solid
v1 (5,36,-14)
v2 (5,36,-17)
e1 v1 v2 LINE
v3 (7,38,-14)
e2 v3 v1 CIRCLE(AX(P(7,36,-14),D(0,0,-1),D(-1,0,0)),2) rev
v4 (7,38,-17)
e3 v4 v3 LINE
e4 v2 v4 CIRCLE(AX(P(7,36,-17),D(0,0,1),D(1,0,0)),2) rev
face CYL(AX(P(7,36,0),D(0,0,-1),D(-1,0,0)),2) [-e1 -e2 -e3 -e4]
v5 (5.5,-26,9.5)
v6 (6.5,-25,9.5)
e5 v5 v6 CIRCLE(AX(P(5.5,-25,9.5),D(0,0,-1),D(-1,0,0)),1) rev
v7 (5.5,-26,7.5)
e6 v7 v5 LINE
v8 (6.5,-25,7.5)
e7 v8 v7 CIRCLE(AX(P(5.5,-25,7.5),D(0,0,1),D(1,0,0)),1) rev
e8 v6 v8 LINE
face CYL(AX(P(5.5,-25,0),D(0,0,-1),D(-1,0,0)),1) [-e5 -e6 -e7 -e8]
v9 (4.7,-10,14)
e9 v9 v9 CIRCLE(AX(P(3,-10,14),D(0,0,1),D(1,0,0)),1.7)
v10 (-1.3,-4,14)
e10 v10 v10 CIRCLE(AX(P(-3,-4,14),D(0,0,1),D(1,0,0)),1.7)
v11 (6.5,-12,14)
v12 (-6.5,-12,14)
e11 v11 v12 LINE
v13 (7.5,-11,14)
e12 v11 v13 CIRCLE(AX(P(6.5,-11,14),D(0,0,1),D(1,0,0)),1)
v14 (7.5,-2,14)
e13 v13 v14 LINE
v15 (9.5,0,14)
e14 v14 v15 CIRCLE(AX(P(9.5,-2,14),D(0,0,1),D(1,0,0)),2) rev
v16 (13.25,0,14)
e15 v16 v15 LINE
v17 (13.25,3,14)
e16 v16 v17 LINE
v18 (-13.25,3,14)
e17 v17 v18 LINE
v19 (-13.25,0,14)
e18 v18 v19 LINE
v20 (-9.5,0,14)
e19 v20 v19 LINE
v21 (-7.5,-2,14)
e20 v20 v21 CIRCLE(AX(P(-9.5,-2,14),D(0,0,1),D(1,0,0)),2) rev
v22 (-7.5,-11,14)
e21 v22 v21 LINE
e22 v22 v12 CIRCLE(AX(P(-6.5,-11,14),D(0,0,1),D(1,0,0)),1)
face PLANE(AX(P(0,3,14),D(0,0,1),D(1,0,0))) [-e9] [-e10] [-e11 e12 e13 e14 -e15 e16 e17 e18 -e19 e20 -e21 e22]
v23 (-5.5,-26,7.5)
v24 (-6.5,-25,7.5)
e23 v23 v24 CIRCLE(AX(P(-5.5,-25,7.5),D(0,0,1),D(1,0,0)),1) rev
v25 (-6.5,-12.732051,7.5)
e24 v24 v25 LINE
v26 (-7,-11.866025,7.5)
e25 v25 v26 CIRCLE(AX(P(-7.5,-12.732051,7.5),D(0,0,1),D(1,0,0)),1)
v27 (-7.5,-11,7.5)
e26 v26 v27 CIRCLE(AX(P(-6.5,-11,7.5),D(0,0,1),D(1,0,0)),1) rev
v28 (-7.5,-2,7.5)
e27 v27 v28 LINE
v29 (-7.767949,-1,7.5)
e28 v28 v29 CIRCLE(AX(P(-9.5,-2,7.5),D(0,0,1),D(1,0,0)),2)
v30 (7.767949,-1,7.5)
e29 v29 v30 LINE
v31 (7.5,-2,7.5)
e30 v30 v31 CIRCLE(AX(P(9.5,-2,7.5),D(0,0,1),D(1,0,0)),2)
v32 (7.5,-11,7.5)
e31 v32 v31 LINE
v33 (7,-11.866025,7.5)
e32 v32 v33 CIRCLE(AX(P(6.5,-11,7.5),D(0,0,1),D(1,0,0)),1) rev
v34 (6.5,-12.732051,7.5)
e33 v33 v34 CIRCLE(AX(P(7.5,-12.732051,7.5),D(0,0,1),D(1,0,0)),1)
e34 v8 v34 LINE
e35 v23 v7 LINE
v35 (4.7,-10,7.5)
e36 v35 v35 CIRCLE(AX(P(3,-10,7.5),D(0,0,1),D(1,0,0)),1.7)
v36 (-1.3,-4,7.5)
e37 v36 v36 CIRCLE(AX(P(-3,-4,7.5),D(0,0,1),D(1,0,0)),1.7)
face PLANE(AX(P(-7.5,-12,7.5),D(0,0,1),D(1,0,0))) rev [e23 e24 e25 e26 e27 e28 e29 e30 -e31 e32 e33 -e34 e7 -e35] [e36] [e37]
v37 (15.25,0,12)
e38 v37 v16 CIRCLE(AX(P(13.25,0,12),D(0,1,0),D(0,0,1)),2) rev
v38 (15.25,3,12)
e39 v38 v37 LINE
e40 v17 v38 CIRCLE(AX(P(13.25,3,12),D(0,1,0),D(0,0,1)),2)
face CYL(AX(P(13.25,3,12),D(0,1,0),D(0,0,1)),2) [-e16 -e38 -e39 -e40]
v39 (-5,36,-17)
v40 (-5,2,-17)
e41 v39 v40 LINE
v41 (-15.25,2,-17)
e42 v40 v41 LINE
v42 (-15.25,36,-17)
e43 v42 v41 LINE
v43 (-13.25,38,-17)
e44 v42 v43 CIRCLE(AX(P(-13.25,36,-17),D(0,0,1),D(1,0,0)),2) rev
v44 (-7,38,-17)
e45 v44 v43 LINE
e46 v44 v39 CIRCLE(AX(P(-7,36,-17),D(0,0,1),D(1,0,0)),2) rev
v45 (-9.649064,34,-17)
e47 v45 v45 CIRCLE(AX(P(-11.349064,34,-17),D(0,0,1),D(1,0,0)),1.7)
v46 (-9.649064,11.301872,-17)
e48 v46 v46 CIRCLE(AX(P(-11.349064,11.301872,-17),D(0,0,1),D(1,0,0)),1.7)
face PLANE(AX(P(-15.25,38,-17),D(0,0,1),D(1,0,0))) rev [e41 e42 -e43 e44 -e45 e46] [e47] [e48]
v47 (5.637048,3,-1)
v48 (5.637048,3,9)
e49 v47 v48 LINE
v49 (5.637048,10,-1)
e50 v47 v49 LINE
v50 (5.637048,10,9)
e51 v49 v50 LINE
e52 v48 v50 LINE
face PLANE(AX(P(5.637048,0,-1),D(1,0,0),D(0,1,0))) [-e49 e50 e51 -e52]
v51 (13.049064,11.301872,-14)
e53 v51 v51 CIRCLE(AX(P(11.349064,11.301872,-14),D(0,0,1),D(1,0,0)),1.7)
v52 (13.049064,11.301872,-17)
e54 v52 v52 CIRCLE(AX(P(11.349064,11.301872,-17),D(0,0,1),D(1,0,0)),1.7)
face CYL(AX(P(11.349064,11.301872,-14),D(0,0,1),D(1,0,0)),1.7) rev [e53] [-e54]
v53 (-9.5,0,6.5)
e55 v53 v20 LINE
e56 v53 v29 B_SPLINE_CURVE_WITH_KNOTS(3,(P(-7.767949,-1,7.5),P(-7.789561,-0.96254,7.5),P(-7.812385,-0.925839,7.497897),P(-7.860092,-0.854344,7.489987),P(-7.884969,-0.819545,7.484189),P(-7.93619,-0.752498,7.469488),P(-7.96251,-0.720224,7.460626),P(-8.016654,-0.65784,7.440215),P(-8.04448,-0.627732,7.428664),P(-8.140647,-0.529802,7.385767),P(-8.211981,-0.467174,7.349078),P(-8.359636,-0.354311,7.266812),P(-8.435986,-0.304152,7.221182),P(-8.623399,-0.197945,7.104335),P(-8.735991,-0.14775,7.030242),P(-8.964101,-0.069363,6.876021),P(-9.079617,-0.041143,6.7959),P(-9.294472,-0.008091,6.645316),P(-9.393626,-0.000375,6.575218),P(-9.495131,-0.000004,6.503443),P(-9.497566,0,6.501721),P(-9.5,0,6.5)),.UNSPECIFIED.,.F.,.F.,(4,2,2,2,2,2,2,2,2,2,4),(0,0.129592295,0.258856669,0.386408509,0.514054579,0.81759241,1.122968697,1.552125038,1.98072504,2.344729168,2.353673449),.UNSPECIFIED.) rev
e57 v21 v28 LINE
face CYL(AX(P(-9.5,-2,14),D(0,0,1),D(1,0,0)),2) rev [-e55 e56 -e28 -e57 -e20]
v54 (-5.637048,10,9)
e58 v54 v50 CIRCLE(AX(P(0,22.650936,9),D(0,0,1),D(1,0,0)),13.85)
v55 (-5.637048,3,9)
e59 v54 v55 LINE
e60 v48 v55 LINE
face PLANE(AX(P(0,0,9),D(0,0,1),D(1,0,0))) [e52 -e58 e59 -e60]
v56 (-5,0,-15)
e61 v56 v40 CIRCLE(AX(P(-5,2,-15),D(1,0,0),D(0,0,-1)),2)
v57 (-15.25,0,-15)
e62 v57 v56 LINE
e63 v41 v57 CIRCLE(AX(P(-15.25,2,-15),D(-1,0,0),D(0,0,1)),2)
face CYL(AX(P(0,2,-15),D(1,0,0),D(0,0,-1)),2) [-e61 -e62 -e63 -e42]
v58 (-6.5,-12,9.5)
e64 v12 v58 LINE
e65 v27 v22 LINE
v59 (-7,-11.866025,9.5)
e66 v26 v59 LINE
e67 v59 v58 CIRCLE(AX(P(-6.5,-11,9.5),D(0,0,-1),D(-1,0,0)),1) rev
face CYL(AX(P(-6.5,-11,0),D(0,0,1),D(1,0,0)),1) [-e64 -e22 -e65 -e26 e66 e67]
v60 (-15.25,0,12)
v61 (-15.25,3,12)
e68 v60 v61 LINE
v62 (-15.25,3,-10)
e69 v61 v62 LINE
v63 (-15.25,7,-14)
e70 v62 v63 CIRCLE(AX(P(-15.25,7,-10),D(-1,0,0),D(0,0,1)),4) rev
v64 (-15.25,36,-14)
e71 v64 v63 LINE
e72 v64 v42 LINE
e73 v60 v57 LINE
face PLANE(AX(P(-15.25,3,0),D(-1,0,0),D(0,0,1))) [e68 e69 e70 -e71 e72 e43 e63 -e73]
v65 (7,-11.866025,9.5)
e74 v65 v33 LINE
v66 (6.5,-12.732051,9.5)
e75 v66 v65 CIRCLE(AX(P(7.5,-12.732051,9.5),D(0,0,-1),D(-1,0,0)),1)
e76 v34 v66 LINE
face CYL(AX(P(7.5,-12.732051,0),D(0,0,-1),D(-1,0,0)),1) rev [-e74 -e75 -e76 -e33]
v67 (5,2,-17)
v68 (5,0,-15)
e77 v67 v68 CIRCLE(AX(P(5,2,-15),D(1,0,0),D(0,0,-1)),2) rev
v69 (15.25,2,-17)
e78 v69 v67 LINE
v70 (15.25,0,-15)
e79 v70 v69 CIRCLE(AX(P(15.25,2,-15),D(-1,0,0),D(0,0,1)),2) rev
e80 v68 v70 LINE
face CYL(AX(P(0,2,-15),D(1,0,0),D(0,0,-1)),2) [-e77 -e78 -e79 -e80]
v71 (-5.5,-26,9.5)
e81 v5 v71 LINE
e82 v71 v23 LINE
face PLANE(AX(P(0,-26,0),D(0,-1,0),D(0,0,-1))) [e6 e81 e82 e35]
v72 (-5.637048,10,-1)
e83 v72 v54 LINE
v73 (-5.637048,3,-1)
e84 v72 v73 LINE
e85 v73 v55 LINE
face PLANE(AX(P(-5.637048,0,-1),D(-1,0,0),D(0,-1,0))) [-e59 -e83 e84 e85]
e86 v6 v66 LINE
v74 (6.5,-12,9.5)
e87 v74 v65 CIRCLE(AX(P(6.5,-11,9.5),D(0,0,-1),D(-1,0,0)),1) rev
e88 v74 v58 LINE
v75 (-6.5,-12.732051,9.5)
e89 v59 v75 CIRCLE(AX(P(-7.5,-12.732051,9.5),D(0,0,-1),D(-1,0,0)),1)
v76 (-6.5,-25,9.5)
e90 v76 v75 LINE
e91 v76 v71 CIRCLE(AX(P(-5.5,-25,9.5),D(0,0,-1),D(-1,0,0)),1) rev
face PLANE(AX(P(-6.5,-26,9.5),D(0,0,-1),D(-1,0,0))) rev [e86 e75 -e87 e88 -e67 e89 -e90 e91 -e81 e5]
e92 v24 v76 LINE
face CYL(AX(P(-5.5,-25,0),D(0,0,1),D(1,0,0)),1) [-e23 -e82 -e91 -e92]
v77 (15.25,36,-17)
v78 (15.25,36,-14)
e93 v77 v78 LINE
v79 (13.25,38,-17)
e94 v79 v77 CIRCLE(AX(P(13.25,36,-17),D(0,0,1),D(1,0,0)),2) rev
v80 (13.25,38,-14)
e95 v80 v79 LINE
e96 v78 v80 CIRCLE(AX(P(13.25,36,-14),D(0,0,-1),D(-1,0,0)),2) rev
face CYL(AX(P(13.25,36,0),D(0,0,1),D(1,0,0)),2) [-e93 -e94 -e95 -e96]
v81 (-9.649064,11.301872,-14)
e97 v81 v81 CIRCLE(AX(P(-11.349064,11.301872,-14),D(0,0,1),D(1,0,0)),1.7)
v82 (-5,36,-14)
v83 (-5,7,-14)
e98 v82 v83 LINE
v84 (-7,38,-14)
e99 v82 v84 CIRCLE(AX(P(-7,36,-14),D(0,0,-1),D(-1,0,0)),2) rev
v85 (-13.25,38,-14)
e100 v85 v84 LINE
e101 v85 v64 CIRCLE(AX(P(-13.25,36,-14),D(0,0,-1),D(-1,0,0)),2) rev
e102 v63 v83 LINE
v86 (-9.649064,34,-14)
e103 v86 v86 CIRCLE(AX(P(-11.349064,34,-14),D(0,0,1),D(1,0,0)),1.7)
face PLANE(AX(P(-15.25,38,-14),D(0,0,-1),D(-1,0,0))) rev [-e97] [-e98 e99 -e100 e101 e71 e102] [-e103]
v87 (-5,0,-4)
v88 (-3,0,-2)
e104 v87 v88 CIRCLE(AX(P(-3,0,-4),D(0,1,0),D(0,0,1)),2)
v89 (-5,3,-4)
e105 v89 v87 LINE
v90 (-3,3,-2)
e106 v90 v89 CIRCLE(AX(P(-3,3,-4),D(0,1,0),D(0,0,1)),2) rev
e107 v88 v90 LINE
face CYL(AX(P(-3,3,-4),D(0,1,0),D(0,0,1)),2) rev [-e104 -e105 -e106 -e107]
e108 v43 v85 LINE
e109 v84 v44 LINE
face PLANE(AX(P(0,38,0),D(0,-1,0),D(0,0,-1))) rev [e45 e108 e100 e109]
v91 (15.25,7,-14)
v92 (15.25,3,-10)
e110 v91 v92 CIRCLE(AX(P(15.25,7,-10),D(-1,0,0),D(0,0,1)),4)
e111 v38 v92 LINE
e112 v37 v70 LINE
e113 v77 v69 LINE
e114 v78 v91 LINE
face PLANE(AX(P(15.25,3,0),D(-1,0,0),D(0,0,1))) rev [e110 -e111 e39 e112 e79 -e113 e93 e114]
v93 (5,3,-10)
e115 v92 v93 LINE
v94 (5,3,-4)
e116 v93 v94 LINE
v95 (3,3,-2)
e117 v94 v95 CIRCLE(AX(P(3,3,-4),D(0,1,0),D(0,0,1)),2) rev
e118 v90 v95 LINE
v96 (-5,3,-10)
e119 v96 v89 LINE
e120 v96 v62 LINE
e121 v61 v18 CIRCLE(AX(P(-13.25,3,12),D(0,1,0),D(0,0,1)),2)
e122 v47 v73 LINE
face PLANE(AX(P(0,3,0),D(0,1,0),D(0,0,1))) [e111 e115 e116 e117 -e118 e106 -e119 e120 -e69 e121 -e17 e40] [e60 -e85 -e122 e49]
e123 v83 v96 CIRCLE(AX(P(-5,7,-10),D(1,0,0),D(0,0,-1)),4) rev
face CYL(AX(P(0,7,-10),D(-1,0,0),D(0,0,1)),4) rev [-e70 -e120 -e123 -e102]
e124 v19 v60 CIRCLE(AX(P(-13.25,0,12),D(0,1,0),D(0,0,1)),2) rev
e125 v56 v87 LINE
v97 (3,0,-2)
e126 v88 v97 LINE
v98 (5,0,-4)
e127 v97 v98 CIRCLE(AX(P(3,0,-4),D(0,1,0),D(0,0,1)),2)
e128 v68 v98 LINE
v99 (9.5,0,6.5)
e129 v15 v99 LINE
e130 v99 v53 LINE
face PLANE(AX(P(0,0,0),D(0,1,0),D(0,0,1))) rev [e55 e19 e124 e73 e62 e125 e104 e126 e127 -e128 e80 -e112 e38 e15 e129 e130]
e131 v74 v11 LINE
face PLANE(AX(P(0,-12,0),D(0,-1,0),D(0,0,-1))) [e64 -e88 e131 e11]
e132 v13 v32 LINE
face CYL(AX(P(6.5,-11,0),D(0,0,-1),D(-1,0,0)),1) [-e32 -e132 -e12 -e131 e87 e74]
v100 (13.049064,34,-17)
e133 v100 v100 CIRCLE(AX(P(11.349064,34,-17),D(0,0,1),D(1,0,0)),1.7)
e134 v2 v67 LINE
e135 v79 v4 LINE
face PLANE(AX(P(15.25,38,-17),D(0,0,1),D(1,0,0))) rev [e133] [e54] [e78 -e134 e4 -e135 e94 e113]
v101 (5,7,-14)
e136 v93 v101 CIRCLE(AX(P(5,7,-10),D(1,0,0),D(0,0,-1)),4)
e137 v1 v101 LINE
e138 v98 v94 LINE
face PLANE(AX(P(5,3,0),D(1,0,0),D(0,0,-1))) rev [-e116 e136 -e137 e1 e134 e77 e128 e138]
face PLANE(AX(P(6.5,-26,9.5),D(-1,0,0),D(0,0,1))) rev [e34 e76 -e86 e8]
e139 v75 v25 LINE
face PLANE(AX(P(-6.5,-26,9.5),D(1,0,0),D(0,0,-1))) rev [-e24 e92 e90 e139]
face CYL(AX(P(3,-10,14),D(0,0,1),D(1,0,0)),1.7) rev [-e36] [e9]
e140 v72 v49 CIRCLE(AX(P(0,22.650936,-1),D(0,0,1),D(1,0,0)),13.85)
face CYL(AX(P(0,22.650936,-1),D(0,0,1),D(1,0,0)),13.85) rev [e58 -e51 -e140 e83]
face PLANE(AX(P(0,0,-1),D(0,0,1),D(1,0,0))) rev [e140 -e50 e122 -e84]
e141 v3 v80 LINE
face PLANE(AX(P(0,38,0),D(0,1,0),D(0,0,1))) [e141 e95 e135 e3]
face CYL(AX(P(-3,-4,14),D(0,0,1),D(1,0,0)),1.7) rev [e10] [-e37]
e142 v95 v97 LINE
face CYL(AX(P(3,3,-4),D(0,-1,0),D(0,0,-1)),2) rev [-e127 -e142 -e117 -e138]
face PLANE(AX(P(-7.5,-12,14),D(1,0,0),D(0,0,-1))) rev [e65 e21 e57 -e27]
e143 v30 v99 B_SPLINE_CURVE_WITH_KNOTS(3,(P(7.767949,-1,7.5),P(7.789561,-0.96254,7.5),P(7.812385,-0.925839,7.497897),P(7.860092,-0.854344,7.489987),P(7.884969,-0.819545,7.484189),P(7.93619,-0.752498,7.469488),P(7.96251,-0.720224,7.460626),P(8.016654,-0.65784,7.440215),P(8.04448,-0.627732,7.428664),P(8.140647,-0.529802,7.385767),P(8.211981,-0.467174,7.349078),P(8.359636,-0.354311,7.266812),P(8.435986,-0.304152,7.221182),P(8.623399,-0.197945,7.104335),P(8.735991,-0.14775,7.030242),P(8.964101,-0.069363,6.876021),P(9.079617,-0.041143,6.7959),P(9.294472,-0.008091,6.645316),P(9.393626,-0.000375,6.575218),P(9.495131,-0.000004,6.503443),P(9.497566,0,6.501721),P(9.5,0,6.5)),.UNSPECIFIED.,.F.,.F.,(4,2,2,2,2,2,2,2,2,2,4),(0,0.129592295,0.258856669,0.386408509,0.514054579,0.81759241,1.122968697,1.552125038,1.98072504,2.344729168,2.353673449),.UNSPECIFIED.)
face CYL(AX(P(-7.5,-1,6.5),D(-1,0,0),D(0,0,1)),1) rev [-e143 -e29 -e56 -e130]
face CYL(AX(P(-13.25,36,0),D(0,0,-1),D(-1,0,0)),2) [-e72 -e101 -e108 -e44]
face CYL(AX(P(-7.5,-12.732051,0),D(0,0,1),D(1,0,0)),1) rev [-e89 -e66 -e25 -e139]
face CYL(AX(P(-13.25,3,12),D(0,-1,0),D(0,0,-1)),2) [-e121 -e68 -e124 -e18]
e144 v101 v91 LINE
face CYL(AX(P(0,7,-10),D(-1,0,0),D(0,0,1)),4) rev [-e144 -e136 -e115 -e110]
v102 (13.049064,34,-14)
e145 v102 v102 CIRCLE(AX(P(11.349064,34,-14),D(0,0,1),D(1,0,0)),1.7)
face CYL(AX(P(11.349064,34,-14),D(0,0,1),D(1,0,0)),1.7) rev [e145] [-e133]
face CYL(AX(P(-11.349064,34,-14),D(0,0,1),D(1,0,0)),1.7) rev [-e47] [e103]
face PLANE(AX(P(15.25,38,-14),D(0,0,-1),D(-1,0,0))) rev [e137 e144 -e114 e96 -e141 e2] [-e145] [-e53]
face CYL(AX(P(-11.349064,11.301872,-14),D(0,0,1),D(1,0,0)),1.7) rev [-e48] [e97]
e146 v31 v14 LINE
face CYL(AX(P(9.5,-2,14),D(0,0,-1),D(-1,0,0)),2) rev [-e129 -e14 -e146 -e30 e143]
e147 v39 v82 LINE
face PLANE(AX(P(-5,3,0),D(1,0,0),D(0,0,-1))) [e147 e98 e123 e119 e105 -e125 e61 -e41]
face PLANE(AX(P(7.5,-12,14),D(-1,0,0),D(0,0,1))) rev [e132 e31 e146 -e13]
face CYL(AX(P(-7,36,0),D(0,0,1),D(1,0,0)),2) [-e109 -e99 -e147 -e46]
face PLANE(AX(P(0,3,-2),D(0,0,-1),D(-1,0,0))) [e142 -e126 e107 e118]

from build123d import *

# Parameters (mm, degrees)
BOSS_EXTRUDE1_DEPTH      = 3
BOSS_EXTRUDE2_DEPTH      = 35
BOSS_EXTRUDE2_DEPTH_BACK = 3
SKETCH3_W                = 10.25
SKETCH3_H                = 3
SKETCH4_W                = 15
SKETCH4_H                = 6.5
BOSS_EXTRUDE3_DEPTH      = 12
M3_CLEARANCE_HOLE1_D     = 3.4
M3_CLEARANCE_HOLE2_D     = 3.4
FILLET1_R                = 1
FILLET2_R                = 2
FILLET3_R                = 1
SKETCH11_W               = 13
SKETCH11_H               = 2
BOSS_EXTRUDE4_DEPTH      = 14
FILLET4_R                = 1
FILLET5_R                = 4
BOSS_EXTRUDE5_START      = -5
BOSS_EXTRUDE5_DEPTH      = 10


with BuildPart() as part:
    # Sketch2 → Boss-Extrude1 (new body)
    with BuildSketch(Plane(origin=(0, 0, 0), x_dir=(1, 0, 0), z_dir=(0, 1, 0))):
        Polygon((-15.25, -14), (15.25, -14), (15.25, 14), (5, 14), (5, 2), (-5, 2), (-5, 14), (-15.25, 14), align=None)
    extrude(amount=BOSS_EXTRUDE1_DEPTH)

    # Sketch3 → Boss-Extrude2 (add, two sides: drawn at the far end of the back side and taken through both)
    with BuildSketch(Plane(origin=(0, 3, 0), x_dir=(1, 0, 0), z_dir=(0, 1, 0)).offset(-BOSS_EXTRUDE2_DEPTH_BACK)):
        with Locations((-10.125, 15.5)):
            Rectangle(SKETCH3_W, SKETCH3_H)
        with Locations((10.125, 15.5)):
            Rectangle(SKETCH3_W, SKETCH3_H)
    extrude(amount=BOSS_EXTRUDE2_DEPTH + BOSS_EXTRUDE2_DEPTH_BACK)

    # Sketch4 → Boss-Extrude3 (add)
    with BuildSketch(Plane.XZ):
        with Locations((0, 10.75)):
            Rectangle(SKETCH4_W, SKETCH4_H)
    extrude(amount=BOSS_EXTRUDE3_DEPTH)

    # M3 Clearance Hole1 (through all)
    with Locations(Plane.XY.offset(14)):
        with Locations((-3, -4), (3, -10)):
            Hole(M3_CLEARANCE_HOLE1_D / 2)

    # M3 Clearance Hole2 (through all)
    with Locations(Plane.XY.offset(-14)):
        with Locations((-11.34906384, 34), (11.34906384, 34), (11.34906384, 11.30187232), (-11.34906384, 11.30187232)):
            Hole(M3_CLEARANCE_HOLE2_D / 2)

    # Fillet1
    fillet1_edges = [part.edges().sort_by_distance(p)[0] for p in [
        (-7.5, -12, 10.75),
        (7.5, -12, 10.75),
    ]]
    fillet(fillet1_edges, radius=FILLET1_R)

    # Fillet2
    fillet2_edges = [part.edges().sort_by_distance(p)[0] for p in [
        (15.25, 1.5, 14),
        (-15.25, 1.5, 14),
        (-5, 1.5, -2),
        (5, 1.5, -2),
        (-15.25, 38, -15.5),
        (-5, 38, -15.5),
        (-10.125, 0, -17),
        (15.25, 38, -15.5),
        (5, 38, -15.5),
        (10.125, 0, -17),
        (-7.5, 0, 10.75),
        (7.5, 0, 10.75),
    ]]
    fillet(fillet2_edges, radius=FILLET2_R)

    # Fillet3
    fillet3_edges = [part.edges().sort_by_distance(p)[0] for p in [
        (0, 0, 7.5),
    ]]
    fillet(fillet3_edges, radius=FILLET3_R - 0.0001)  # a hair under: the kernel refuses the full size

    # Sketch11 → Boss-Extrude4 (add)
    with BuildSketch(Plane.XZ.offset(12)):
        with Locations((0, 8.5)):
            Rectangle(SKETCH11_W, SKETCH11_H)
    extrude(amount=BOSS_EXTRUDE4_DEPTH)

    # Fillet4
    fillet4_edges = [part.edges().sort_by_distance(p)[0] for p in [
        (-6.5, -12, 8.5),
        (-6.5, -26, 8.5),
        (6.5, -26, 8.5),
        (6.5, -12, 8.5),
    ]]
    fillet(fillet4_edges, radius=FILLET4_R)

    # Fillet5
    fillet5_edges = [part.edges().sort_by_distance(p)[0] for p in [
        (-10.125, 3, -14),
        (10.125, 3, -14),
    ]]
    fillet(fillet5_edges, radius=FILLET5_R)

    # Sketch13 → Boss-Extrude5 (add)
    with BuildSketch(Plane.XY.offset(14).offset(BOSS_EXTRUDE5_START)):
        with BuildLine():
            Line((-5.637048368, 10), (-5.637048368, 3))
            Line((-5.637048368, 3), (5.637048368, 3))
            Line((5.637048368, 3), (5.637048368, 10))
            ThreePointArc((5.637048368, 10), (0, 8.800936159), (-5.637048368, 10))
        make_face()
    extrude(amount=-BOSS_EXTRUDE5_DEPTH)


solid = part.part
